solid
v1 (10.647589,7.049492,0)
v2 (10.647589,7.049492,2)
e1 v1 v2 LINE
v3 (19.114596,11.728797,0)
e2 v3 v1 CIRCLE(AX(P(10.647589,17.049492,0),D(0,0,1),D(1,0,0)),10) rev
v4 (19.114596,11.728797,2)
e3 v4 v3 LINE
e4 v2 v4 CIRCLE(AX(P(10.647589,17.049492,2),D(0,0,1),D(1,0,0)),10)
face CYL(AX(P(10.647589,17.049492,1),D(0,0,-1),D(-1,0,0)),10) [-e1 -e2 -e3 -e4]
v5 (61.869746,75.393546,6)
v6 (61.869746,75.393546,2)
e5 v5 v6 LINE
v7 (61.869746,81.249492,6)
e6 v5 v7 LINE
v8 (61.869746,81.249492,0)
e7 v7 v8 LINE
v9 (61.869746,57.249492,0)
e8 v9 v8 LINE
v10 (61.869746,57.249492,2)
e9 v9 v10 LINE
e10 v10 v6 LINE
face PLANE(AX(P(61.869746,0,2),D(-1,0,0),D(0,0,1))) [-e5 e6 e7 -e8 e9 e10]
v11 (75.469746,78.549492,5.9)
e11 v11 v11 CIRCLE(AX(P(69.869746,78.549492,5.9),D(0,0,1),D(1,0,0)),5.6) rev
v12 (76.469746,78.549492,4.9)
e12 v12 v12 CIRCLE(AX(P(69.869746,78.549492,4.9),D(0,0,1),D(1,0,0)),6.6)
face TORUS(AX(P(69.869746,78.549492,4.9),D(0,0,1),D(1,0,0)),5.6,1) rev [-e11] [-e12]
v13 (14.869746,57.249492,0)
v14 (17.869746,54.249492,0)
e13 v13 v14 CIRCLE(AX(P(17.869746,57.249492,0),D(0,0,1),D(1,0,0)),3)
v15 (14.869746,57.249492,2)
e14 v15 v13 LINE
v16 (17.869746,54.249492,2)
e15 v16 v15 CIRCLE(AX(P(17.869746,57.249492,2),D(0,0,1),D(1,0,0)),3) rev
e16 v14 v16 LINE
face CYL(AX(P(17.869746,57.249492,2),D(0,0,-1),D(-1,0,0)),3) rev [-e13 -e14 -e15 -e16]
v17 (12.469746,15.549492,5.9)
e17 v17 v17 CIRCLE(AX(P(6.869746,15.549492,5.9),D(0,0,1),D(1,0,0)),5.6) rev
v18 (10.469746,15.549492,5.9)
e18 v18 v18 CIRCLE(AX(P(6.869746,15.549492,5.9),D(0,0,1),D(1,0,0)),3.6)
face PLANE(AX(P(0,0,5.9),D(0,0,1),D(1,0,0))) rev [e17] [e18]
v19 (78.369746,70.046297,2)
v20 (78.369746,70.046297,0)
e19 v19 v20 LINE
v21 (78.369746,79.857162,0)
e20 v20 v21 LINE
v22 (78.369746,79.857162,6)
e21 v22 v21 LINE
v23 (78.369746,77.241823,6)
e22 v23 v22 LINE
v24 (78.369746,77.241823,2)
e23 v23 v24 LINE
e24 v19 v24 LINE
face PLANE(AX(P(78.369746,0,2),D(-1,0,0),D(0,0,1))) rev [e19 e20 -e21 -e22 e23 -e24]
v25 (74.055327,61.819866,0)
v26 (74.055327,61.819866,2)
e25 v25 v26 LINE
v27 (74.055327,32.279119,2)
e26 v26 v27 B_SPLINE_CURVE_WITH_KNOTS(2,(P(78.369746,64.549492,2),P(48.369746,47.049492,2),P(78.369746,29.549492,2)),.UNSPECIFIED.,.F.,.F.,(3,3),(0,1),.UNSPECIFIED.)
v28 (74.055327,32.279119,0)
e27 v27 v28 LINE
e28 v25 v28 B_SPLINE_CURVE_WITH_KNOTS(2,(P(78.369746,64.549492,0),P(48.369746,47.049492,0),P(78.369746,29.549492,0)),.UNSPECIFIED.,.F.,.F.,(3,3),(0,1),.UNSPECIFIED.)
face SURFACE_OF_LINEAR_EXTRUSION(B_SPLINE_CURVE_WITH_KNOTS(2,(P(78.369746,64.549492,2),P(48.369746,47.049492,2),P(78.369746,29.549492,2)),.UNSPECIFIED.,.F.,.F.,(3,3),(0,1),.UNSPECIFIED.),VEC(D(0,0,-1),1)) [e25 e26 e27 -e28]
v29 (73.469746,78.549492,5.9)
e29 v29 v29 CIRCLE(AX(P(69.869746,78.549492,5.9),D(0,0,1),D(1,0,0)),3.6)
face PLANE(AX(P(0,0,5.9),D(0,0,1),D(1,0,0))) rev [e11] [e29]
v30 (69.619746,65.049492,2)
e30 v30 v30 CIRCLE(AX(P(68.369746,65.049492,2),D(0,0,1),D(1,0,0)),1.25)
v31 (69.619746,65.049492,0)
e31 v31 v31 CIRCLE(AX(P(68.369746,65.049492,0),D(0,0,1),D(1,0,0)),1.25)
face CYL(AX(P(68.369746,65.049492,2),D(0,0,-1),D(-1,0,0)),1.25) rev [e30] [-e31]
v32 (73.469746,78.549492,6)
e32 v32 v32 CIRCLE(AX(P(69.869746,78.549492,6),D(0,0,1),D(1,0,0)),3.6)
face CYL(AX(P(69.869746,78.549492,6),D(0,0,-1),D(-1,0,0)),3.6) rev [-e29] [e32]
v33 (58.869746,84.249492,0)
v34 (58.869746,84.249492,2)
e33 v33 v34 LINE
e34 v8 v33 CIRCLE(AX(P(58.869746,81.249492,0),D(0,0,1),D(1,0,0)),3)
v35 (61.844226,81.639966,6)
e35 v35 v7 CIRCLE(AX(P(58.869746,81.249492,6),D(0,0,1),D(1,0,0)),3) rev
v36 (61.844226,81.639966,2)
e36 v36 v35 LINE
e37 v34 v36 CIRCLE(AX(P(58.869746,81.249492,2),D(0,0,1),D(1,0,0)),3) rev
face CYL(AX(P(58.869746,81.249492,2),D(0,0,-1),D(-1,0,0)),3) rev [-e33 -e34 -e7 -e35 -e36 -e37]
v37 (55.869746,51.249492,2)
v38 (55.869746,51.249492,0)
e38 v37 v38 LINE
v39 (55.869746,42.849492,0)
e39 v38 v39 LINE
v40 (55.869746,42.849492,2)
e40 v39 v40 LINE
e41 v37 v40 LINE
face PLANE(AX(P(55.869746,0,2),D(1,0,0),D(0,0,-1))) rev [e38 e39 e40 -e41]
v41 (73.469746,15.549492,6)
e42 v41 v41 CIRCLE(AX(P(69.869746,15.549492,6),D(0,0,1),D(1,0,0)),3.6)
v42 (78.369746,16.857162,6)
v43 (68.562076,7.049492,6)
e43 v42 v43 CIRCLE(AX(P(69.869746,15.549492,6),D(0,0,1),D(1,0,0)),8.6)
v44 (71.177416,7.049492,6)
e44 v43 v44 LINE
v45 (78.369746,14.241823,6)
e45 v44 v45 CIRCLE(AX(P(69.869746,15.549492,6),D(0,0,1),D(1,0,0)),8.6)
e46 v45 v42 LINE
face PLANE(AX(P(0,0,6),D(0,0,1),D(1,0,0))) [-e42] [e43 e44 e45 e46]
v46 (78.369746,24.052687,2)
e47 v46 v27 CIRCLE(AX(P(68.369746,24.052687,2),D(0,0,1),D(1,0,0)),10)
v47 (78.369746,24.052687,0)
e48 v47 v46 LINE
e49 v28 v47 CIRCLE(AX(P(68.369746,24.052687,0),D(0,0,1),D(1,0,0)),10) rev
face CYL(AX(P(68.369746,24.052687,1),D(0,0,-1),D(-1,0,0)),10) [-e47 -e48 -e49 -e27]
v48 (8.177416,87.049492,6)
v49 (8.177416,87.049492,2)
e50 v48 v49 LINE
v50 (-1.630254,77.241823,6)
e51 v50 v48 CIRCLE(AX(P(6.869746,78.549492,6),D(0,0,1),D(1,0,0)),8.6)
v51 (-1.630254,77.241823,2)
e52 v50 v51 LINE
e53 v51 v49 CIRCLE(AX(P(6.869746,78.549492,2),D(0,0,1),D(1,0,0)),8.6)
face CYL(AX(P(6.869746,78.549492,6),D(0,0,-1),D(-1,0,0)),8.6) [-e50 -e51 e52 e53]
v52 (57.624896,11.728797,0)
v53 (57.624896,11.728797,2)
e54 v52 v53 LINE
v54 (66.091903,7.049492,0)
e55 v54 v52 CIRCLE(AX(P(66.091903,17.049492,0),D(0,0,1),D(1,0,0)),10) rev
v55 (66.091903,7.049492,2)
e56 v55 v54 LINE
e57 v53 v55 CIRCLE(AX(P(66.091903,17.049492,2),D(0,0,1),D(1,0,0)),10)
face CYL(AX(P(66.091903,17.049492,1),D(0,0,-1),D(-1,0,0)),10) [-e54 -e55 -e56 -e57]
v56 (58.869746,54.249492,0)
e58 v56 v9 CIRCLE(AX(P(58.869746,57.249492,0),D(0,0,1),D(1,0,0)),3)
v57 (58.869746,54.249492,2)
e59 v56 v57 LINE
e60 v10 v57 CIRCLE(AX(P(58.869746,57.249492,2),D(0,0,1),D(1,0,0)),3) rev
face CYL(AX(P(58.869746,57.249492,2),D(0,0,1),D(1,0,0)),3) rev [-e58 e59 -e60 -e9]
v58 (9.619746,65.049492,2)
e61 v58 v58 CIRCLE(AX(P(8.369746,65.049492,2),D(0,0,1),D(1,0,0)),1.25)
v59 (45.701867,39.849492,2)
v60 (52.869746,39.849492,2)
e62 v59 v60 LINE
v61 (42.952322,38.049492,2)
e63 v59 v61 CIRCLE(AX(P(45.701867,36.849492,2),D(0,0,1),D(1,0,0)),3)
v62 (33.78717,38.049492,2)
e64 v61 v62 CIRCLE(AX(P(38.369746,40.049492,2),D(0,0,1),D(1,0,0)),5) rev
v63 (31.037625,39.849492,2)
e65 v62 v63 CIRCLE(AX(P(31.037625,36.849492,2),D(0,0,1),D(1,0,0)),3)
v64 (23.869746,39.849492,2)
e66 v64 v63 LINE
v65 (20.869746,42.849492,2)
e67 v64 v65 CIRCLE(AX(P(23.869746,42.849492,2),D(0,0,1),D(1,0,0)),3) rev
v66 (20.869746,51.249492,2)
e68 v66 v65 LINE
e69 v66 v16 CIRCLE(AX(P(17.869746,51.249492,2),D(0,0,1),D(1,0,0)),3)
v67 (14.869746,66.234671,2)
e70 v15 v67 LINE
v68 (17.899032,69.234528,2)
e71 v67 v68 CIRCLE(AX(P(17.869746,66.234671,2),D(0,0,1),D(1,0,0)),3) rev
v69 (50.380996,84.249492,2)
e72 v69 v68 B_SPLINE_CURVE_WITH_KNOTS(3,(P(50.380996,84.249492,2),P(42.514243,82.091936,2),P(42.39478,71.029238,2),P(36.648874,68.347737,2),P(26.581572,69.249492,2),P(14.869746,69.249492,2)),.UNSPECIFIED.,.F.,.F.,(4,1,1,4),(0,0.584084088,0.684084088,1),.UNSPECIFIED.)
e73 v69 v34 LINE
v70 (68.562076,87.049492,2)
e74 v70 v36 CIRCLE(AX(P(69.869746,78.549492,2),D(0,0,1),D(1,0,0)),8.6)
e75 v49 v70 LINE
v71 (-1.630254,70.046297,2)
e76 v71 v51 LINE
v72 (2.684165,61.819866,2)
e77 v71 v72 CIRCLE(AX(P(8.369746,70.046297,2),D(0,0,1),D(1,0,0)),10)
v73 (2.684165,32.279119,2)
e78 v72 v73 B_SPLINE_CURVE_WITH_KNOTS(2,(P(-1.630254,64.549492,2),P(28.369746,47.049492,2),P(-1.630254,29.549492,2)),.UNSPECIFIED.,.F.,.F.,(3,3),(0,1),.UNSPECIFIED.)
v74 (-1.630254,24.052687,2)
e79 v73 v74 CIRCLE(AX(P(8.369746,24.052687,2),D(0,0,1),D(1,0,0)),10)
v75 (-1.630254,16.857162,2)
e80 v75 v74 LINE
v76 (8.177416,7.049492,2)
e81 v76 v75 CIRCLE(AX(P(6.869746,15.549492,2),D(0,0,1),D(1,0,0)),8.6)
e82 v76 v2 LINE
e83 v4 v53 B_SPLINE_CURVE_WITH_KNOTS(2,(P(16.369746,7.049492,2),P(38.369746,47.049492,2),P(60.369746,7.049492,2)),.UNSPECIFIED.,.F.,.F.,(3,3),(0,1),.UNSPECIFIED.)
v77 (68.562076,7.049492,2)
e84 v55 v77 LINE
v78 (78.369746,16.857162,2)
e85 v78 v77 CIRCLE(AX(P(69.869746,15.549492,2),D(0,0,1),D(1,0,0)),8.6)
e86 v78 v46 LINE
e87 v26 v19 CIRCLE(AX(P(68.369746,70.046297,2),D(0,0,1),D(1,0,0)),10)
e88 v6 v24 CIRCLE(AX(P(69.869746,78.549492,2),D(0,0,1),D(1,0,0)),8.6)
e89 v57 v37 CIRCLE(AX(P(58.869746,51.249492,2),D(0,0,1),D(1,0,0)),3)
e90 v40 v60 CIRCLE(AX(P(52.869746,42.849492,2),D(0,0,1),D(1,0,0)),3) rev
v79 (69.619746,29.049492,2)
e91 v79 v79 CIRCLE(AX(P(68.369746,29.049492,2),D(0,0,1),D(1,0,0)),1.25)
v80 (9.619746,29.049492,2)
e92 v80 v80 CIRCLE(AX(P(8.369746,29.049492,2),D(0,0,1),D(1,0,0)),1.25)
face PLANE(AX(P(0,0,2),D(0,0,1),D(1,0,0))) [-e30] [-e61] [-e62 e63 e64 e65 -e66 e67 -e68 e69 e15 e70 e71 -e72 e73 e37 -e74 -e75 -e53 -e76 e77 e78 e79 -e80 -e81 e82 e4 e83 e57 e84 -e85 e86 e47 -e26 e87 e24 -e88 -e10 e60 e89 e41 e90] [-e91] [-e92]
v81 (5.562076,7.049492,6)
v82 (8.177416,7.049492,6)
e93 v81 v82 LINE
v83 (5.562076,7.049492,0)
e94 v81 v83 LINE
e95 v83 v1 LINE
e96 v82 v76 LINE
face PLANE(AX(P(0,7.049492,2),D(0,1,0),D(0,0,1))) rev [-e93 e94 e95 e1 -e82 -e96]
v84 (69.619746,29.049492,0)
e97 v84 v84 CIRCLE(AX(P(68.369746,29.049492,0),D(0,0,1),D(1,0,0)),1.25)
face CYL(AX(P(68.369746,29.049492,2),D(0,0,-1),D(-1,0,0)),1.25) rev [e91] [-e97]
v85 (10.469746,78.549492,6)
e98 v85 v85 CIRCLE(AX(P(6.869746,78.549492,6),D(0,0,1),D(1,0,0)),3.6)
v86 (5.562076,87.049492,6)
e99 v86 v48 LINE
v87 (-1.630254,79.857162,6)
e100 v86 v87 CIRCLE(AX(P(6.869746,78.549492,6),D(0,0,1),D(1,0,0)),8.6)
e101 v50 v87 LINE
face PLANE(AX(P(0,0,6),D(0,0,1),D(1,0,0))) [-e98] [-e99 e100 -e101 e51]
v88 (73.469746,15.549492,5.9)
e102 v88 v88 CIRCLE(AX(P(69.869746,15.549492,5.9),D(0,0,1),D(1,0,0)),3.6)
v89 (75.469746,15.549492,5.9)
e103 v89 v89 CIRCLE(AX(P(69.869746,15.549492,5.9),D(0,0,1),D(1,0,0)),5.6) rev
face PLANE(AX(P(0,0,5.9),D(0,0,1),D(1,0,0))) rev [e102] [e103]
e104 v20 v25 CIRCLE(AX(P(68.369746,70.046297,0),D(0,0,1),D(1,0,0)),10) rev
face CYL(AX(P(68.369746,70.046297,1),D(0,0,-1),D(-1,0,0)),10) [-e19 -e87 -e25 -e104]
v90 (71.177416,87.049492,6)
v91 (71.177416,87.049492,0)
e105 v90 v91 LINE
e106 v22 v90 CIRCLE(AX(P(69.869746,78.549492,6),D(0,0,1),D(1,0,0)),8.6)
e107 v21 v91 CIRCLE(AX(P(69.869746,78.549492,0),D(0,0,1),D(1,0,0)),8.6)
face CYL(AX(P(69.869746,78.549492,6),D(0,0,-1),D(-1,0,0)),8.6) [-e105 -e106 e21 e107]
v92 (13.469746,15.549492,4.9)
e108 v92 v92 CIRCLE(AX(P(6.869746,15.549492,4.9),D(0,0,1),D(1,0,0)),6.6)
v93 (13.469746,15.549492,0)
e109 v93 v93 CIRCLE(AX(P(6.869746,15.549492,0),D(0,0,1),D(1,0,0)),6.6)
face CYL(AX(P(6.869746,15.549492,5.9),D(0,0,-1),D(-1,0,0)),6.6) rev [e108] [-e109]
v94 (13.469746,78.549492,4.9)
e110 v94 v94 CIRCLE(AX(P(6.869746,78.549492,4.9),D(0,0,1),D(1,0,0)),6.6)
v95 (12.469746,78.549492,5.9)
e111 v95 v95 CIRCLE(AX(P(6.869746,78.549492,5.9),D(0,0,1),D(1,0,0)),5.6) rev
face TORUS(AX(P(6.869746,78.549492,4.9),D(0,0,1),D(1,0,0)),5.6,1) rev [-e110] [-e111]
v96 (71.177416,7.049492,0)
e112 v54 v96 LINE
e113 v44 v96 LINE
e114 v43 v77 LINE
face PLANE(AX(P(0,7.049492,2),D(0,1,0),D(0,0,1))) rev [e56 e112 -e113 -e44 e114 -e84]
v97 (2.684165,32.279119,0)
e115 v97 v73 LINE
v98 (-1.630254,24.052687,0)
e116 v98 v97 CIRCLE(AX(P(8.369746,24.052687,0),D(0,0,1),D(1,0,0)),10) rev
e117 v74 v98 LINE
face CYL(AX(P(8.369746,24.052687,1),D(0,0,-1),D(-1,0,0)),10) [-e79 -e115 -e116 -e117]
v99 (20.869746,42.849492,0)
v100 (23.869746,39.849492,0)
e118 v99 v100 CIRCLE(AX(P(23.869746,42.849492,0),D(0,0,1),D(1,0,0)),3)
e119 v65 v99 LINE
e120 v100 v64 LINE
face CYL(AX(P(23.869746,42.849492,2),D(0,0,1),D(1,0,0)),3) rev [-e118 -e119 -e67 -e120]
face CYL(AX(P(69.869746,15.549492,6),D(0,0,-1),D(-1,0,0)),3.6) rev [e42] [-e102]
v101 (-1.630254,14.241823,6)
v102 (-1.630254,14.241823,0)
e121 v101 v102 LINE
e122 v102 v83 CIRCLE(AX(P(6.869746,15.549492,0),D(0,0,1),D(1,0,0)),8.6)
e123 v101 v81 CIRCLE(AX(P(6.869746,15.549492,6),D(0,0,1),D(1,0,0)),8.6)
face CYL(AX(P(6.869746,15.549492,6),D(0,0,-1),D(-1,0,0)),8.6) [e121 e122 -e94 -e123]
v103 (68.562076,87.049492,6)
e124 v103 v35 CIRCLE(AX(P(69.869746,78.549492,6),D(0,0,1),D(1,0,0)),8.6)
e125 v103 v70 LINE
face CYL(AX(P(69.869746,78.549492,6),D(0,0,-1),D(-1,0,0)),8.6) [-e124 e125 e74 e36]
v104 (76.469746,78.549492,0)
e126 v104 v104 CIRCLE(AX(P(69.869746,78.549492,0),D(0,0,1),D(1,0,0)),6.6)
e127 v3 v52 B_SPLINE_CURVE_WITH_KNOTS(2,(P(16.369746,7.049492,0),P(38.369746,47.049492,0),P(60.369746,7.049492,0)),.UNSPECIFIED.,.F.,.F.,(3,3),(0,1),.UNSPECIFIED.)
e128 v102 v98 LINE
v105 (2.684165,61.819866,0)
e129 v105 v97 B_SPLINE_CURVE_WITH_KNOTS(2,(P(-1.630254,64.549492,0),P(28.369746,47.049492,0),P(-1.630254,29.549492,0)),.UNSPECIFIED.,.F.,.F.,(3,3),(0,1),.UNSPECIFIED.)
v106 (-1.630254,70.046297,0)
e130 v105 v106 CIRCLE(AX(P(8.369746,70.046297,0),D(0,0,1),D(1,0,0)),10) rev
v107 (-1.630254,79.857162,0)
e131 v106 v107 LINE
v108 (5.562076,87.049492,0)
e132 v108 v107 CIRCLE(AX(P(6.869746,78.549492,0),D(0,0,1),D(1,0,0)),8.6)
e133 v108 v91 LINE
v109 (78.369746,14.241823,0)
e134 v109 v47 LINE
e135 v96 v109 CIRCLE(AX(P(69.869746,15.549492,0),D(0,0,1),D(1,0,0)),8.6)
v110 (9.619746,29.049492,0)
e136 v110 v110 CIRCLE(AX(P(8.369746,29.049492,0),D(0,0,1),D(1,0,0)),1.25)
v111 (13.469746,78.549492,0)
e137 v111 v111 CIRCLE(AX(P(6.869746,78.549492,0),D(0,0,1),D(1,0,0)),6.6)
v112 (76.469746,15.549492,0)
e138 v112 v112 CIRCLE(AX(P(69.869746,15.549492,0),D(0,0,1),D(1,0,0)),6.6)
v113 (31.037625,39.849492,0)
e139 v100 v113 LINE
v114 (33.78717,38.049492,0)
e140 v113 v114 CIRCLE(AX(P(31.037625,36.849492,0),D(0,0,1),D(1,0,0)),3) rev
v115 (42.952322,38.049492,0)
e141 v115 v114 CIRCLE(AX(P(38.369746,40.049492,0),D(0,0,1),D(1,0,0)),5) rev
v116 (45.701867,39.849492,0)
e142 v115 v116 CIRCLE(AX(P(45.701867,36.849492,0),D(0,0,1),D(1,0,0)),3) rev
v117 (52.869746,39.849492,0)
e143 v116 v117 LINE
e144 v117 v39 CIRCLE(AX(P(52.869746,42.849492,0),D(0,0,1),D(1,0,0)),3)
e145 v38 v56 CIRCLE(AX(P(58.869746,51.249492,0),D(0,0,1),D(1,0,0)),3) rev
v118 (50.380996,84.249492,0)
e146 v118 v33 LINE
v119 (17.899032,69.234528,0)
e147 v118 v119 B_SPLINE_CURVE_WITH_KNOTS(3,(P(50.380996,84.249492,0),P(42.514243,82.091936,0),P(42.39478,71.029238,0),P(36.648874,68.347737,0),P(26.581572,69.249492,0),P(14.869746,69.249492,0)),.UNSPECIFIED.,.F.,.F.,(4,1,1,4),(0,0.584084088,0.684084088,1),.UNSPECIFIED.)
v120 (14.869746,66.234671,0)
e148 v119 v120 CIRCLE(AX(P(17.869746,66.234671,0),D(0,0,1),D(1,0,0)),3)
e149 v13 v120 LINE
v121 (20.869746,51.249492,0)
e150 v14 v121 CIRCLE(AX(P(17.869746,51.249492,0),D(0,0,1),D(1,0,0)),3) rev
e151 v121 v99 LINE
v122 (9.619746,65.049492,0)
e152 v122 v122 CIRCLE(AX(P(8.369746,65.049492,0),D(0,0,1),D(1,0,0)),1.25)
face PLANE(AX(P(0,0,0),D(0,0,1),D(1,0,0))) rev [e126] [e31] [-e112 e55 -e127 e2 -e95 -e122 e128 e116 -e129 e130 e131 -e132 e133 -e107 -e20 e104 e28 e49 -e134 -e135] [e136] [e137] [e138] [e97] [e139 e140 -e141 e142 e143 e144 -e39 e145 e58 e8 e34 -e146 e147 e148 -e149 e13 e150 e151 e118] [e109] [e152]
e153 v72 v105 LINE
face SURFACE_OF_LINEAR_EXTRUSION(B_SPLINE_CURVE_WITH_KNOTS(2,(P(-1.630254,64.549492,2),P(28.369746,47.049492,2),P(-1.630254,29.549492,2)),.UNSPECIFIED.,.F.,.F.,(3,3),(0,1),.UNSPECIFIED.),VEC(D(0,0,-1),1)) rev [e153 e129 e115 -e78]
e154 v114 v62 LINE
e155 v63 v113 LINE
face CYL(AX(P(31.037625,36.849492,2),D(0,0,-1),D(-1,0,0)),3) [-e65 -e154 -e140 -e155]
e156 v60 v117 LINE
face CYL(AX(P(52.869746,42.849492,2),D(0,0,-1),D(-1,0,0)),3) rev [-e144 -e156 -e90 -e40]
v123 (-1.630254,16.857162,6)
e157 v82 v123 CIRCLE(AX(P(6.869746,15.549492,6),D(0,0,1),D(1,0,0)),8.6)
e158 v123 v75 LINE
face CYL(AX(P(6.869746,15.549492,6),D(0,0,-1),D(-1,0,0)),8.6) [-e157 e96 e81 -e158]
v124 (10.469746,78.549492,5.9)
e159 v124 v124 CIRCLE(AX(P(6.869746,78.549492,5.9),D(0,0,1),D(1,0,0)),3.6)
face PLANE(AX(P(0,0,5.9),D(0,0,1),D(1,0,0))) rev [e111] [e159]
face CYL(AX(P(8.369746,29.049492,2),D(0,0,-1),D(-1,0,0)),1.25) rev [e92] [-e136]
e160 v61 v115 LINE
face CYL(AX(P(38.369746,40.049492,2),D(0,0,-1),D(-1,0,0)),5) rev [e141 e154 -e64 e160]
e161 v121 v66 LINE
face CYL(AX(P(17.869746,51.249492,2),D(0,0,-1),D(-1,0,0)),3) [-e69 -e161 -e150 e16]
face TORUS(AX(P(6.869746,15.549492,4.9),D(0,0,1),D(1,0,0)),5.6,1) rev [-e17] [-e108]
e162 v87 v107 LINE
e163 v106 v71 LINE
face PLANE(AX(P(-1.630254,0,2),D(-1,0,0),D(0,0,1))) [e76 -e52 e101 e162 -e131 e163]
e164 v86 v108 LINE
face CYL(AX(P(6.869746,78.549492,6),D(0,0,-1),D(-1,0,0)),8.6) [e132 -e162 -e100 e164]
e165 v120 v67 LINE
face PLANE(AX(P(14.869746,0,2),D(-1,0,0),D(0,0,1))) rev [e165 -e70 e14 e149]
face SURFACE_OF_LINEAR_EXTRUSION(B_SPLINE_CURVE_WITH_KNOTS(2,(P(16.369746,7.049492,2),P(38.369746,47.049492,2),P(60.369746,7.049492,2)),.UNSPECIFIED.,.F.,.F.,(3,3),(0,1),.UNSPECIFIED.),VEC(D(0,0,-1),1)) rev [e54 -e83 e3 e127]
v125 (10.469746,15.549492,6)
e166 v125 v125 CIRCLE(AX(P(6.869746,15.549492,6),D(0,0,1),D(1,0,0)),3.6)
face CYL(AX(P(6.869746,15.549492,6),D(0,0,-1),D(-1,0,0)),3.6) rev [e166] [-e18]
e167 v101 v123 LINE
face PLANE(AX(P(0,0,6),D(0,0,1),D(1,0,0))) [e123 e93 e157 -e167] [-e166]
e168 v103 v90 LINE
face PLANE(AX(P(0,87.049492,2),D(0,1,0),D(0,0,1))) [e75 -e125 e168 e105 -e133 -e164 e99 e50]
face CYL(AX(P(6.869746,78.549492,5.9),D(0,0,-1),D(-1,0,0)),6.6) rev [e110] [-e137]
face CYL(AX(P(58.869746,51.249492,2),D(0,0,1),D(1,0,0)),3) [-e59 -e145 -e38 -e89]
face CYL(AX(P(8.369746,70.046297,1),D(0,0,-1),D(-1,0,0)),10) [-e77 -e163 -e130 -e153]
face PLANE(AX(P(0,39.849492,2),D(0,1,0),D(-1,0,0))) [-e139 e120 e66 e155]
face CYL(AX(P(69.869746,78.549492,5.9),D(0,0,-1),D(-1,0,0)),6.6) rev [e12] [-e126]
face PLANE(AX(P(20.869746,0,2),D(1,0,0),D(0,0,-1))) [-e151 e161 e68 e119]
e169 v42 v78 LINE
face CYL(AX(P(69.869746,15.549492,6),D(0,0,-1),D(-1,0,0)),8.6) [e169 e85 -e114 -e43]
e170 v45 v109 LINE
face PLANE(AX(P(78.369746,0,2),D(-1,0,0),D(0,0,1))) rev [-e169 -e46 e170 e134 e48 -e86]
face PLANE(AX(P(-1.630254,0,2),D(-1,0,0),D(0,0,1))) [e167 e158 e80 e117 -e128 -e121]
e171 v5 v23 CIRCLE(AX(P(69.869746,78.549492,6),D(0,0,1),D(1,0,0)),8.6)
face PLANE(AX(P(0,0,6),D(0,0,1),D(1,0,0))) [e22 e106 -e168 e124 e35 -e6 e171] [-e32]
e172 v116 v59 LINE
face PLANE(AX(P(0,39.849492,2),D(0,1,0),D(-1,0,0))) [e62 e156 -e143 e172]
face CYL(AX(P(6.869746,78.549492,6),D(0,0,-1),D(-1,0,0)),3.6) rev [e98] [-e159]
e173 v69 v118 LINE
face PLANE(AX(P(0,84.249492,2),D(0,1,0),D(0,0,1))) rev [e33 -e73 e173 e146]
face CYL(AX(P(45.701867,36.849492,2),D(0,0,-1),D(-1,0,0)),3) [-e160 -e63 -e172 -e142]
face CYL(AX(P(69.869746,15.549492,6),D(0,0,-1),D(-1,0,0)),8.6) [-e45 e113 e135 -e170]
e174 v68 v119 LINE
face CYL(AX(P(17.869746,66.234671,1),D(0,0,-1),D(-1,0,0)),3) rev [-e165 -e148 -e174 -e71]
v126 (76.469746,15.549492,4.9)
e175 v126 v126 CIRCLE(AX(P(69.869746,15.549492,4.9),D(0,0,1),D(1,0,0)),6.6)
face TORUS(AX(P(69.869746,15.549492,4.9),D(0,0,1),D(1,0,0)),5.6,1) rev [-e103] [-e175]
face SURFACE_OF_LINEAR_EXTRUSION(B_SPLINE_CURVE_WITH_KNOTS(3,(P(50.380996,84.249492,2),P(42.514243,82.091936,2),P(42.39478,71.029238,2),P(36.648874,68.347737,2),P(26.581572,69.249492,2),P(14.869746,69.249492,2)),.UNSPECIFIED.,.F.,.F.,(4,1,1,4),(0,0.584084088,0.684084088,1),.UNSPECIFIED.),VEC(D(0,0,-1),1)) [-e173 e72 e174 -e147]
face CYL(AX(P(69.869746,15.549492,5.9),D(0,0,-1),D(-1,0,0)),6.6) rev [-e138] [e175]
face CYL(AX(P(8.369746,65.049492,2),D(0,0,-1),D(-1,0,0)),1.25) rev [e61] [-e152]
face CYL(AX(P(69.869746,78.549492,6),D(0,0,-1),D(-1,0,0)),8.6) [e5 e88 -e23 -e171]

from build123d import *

# Parameters (mm, degrees)
SKETCH2_R           = 1.25
SKETCH2_R_2         = 1
BOSS_EXTRUDE1_DEPTH = 2
SKETCH2_6_R         = 3.6
BOSS_EXTRUDE2_DEPTH = 6
SKETCH2_7_R         = 6.6
SKETCH2_7_R_2       = 3.6
CUT_EXTRUDE1_DEPTH  = 5.9
FILLET1_START       = -1
FILLET1_DEPTH       = 7
FILLET1_2_DEPTH     = 2
FILLET1_START_2     = 1.81644
FILLET1_3_DEPTH     = 4.18356
FILLET2_START       = -1
FILLET2_DEPTH       = 7
FILLET3_R           = 1


with BuildPart() as part:
    # Sketch2 → Boss-Extrude1 (new body)
    # profile 1 of 9: a face of its own
    with BuildSketch(Plane.XY):
        with BuildLine():
            Line((55.869745962, 39.84949243), (43.365744361, 39.84949243))
            ThreePointArc((43.365744361, 39.84949243), (38.369745962, 35.04949243), (33.373747564, 39.84949243))
            Line((33.373747564, 39.84949243), (20.869745962, 39.84949243))
            Line((20.869745962, 39.84949243), (20.869745962, 54.24949243))
            Line((20.869745962, 54.24949243), (20.591198677, 54.24949243))
            ThreePointArc((20.591198677, 54.24949243), (15.880795925, 53.206833158), (14.869745962, 57.924121619))
            Line((14.869745962, 57.924121619), (14.869745962, 69.24949243))
            Line((14.869745962, 69.24949243), (14.869745962, 75.393545662))
            ThreePointArc((14.869745962, 75.393545662), (5.912389161, 70.002945294), (-1.630254038, 77.241822747))
            Line((-1.630254038, 77.241822747), (-1.630254038, 64.54949243))
            add(Edge.make_bspline(
                [(-1.630254038, 64.54949243), (28.369745962, 47.04949243), (-1.630254038, 29.54949243)],
                knots=[0, 0, 0, 1, 1, 1], degree=2))
            Line((-1.630254038, 29.54949243), (-1.630254038, 16.857162113))
            ThreePointArc((-1.630254038, 16.857162113), (7.525489815, 24.124455987), (15.469745962, 15.54949243))
            ThreePointArc((15.469745962, 15.54949243), (13.396841766, 9.949758475), (8.177415645, 7.04949243))
            Line((8.177415645, 7.04949243), (16.369745962, 7.04949243))
            add(Edge.make_bspline(
                [(16.369745962, 7.04949243), (38.369745962, 47.04949243), (60.369745962, 7.04949243)],
                knots=[0, 0, 0, 1, 1, 1], degree=2))
            Line((60.369745962, 7.04949243), (68.562076279, 7.04949243))
            ThreePointArc((68.562076279, 7.04949243), (63.788627644, 21.630610748), (78.369745962, 16.857162113))
            Line((78.369745962, 16.857162113), (78.369745962, 29.54949243))
            add(Edge.make_bspline(
                [(78.369745962, 64.54949243), (48.369745962, 47.04949243), (78.369745962, 29.54949243)],
                knots=[0, 0, 0, 1, 1, 1], degree=2))
            Line((78.369745962, 64.54949243), (78.369745962, 77.241822747))
            ThreePointArc((78.369745962, 77.241822747), (70.827102764, 70.002945294), (61.869745962, 75.393545662))
            Line((61.869745962, 75.393545662), (61.869745962, 57.924121619))
            ThreePointArc((61.869745962, 57.924121619), (62.280525574, 57.035978122), (62.421340097, 56.067623833))
            ThreePointArc((62.421340097, 56.067623833), (59.967817965, 52.802018278), (56.148293247, 54.24949243))
            Line((56.148293247, 54.24949243), (55.869745962, 54.24949243))
            Line((55.869745962, 54.24949243), (55.869745962, 39.84949243))
        make_face()
        with Locations((8.369745962, 29.04949243)):
            Circle(SKETCH2_R, mode=Mode.SUBTRACT)
        with Locations((68.369745962, 29.04949243)):
            Circle(SKETCH2_R, mode=Mode.SUBTRACT)
        with Locations((8.369745962, 65.04949243)):
            Circle(SKETCH2_R, mode=Mode.SUBTRACT)
        with Locations((68.369745962, 65.04949243)):
            Circle(SKETCH2_R, mode=Mode.SUBTRACT)
    # profile 2 of 9: a face of its own
    with BuildSketch(Plane.XY):
        with BuildLine():
            Line((61.869745962, 54.24949243), (56.148293247, 54.24949243))
            ThreePointArc((56.148293247, 54.24949243), (59.967817965, 52.802018278), (62.421340097, 56.067623833))
            ThreePointArc((62.421340097, 56.067623833), (62.280525574, 57.035978122), (61.869745962, 57.924121619))
            Line((61.869745962, 57.924121619), (61.869745962, 54.24949243))
        make_face()
    # profile 3 of 9: a face of its own
    with BuildSketch(Plane.XY):
        with BuildLine():
            ThreePointArc((14.869745962, 57.924121619), (15.880795925, 53.206833158), (20.591198677, 54.24949243))
            Line((20.591198677, 54.24949243), (14.869745962, 54.24949243))
            Line((14.869745962, 54.24949243), (14.869745962, 57.924121619))
        make_face()
    # profile 4 of 9: a face of its own
    with BuildSketch(Plane.XY):
        with BuildLine():
            Line((14.869745962, 75.393545662), (14.869745962, 69.24949243))
            add(Edge.make_bspline(
                [(50.380995799, 84.24949243), (42.514243304, 82.091935647), (42.394780295, 71.029237655), (36.64887418, 68.347737451), (26.581571934, 69.24949243), (14.869745962, 69.24949243)],
                knots=[0, 0, 0, 0, 0.584084088, 0.684084088, 1, 1, 1, 1], degree=3))
            Line((50.380995799, 84.24949243), (20.591198677, 84.24949243))
            ThreePointArc((20.591198677, 84.24949243), (20.983757383, 83.377838895), (21.118151828, 82.431361027))
            ThreePointArc((21.118151828, 82.431361027), (19.041016525, 79.299264446), (15.347546538, 79.994102206))
            ThreePointArc((15.347546538, 79.994102206), (15.439141651, 79.274376922), (15.469745962, 78.54949243))
            ThreePointArc((15.469745962, 78.54949243), (15.318414496, 76.94325459), (14.869745962, 75.393545662))
        make_face()
    # profile 5 of 9: a face of its own
    with BuildSketch(Plane.XY):
        with BuildLine():
            Line((61.869745962, 84.24949243), (61.869745962, 81.705439198))
            ThreePointArc((61.869745962, 81.705439198), (62.115152293, 82.26786264), (62.400038731, 82.811355155))
            ThreePointArc((62.400038731, 82.811355155), (59.783560956, 85.744821357), (56.148293247, 84.24949243))
            Line((56.148293247, 84.24949243), (61.869745962, 84.24949243))
        make_face()
    # profile 6 of 9: a face of its own
    with BuildSketch(Plane.XY):
        with BuildLine():
            Line((50.380995799, 84.24949243), (56.148293247, 84.24949243))
            ThreePointArc((56.148293247, 84.24949243), (59.783560956, 85.744821357), (62.400038731, 82.811355155))
            ThreePointArc((62.400038731, 82.811355155), (64.996242267, 85.635320662), (68.562076279, 87.04949243))
            Line((68.562076279, 87.04949243), (8.177415645, 87.04949243))
            ThreePointArc((8.177415645, 87.04949243), (11.743249657, 85.635320662), (14.339453193, 82.811355155))
            ThreePointArc((14.339453193, 82.811355155), (16.955930969, 85.744821357), (20.591198677, 84.24949243))
            Line((20.591198677, 84.24949243), (50.380995799, 84.24949243))
        make_face()
    # profile 7 of 9: a face of its own
    with BuildSketch(Plane.XY):
        with BuildLine():
            ThreePointArc((21.118151828, 82.431361027), (20.983757383, 83.377838895), (20.591198677, 84.24949243))
            Line((20.591198677, 84.24949243), (14.869745962, 84.24949243))
            Line((14.869745962, 84.24949243), (14.869745962, 81.705439198))
            ThreePointArc((14.869745962, 81.705439198), (15.152960708, 80.862143177), (15.347546538, 79.994102206))
            ThreePointArc((15.347546538, 79.994102206), (19.041016525, 79.299264446), (21.118151828, 82.431361027))
        make_face()
        with Locations((17.718151828, 82.431361027)):
            Circle(SKETCH2_R_2, mode=Mode.SUBTRACT)
    # profile 8 of 9: a face of its own
    with BuildSketch(Plane.XY):
        with BuildLine():
            Line((14.869745962, 84.24949243), (20.591198677, 84.24949243))
            ThreePointArc((20.591198677, 84.24949243), (16.955930969, 85.744821357), (14.339453193, 82.811355155))
            ThreePointArc((14.339453193, 82.811355155), (14.624339632, 82.26786264), (14.869745962, 81.705439198))
            Line((14.869745962, 81.705439198), (14.869745962, 84.24949243))
        make_face()
    # profile 9 of 9: a face of its own
    with BuildSketch(Plane.XY):
        with Locations((17.718151828, 82.431361027)):
            Circle(SKETCH2_R_2)
    extrude(amount=BOSS_EXTRUDE1_DEPTH)

    # Sketch2<6> → Boss-Extrude2 (add)
    # profile 1 of 4: a face of its own
    with BuildSketch(Plane.XY):
        with BuildLine():
            Line((61.869745962, 81.705439198), (61.869745962, 75.393545662))
            ThreePointArc((61.869745962, 75.393545662), (70.827102764, 70.002945294), (78.369745962, 77.241822747))
            Line((78.369745962, 77.241822747), (78.369745962, 79.857162113))
            ThreePointArc((78.369745962, 79.857162113), (75.95086428, 84.630610748), (71.177415645, 87.04949243))
            Line((71.177415645, 87.04949243), (68.562076279, 87.04949243))
            ThreePointArc((68.562076279, 87.04949243), (64.503378013, 85.269767352), (61.869745962, 81.705439198))
        make_face()
        with Locations((69.869745962, 78.54949243)):
            Circle(SKETCH2_6_R, mode=Mode.SUBTRACT)
    # profile 2 of 4: a face of its own
    with BuildSketch(Plane.XY):
        with BuildLine():
            ThreePointArc((-1.630254038, 77.241822747), (12.95086428, 72.468374112), (8.177415645, 87.04949243))
            Line((8.177415645, 87.04949243), (5.562076279, 87.04949243))
            ThreePointArc((5.562076279, 87.04949243), (0.788627644, 84.630610748), (-1.630254038, 79.857162113))
            Line((-1.630254038, 79.857162113), (-1.630254038, 77.241822747))
        make_face()
        with Locations((6.869745962, 78.54949243)):
            Circle(SKETCH2_6_R, mode=Mode.SUBTRACT)
    # profile 3 of 4: a face of its own
    with BuildSketch(Plane.XY):
        with BuildLine():
            Line((78.369745962, 14.241822747), (78.369745962, 16.857162113))
            ThreePointArc((78.369745962, 16.857162113), (63.788627644, 21.630610748), (68.562076279, 7.04949243))
            Line((68.562076279, 7.04949243), (71.177415645, 7.04949243))
            ThreePointArc((71.177415645, 7.04949243), (75.95086428, 9.468374112), (78.369745962, 14.241822747))
        make_face()
        with Locations((69.869745962, 15.54949243)):
            Circle(SKETCH2_6_R, mode=Mode.SUBTRACT)
    # profile 4 of 4: a face of its own
    with BuildSketch(Plane.XY):
        with BuildLine():
            ThreePointArc((8.177415645, 7.04949243), (12.95086428, 21.630610748), (-1.630254038, 16.857162113))
            Line((-1.630254038, 16.857162113), (-1.630254038, 14.241822747))
            ThreePointArc((-1.630254038, 14.241822747), (0.788627644, 9.468374112), (5.562076279, 7.04949243))
            Line((5.562076279, 7.04949243), (8.177415645, 7.04949243))
        make_face()
        with Locations((6.869745962, 15.54949243)):
            Circle(SKETCH2_6_R, mode=Mode.SUBTRACT)
    extrude(amount=BOSS_EXTRUDE2_DEPTH)

    # Sketch2<7> → Cut-Extrude1 (cut)
    # profile 1 of 4: a face of its own
    with BuildSketch(Plane.XY):
        with Locations((6.869745962, 15.54949243)):
            Circle(SKETCH2_7_R)
        with Locations((6.869745962, 15.54949243)):
            Circle(SKETCH2_7_R_2, mode=Mode.SUBTRACT)
    # profile 2 of 4: a face of its own
    with BuildSketch(Plane.XY):
        with Locations((69.869745962, 15.54949243)):
            Circle(SKETCH2_7_R)
        with Locations((69.869745962, 15.54949243)):
            Circle(SKETCH2_7_R_2, mode=Mode.SUBTRACT)
    # profile 3 of 4: a face of its own
    with BuildSketch(Plane.XY):
        with Locations((69.869745962, 78.54949243)):
            Circle(SKETCH2_7_R)
        with Locations((69.869745962, 78.54949243)):
            Circle(SKETCH2_7_R_2, mode=Mode.SUBTRACT)
    # profile 4 of 4: a face of its own
    with BuildSketch(Plane.XY):
        with Locations((6.869745962, 78.54949243)):
            Circle(SKETCH2_7_R)
        with Locations((6.869745962, 78.54949243)):
            Circle(SKETCH2_7_R_2, mode=Mode.SUBTRACT)
    extrude(amount=CUT_EXTRUDE1_DEPTH, mode=Mode.SUBTRACT)

    # Fillet1: read off the stored shape, not the designer's step
    # Fillet1 outline → Fillet1 (cut)
    with BuildSketch(Plane.XY.offset(FILLET1_START)):
        with BuildLine():
            Line((20.869745962, 54.24949243), (17.869745962, 54.24949243))
            ThreePointArc((17.869745962, 54.24949243), (19.991066306, 53.370812774), (20.869745962, 51.24949243))
            Line((20.869745962, 51.24949243), (20.869745962, 54.24949243))
        make_face()
        with BuildLine():
            Line((33.373747564, 39.84949243), (31.03762485, 39.84949243))
            ThreePointArc((31.03762485, 39.84949243), (32.680792523, 39.35947251), (33.787170267, 38.04949243))
            ThreePointArc((33.787170267, 38.04949243), (33.496628848, 38.9302384), (33.373747564, 39.84949243))
        make_face()
        with BuildLine():
            ThreePointArc((55.869745962, 51.24949243), (56.748425619, 53.370812773), (58.869745962, 54.24949243))
            Line((58.869745962, 54.24949243), (55.869745962, 54.24949243))
            Line((55.869745962, 54.24949243), (55.869745962, 51.24949243))
        make_face()
        with BuildLine():
            ThreePointArc((43.365744361, 39.84949243), (43.242863077, 38.9302384), (42.952321657, 38.04949243))
            ThreePointArc((42.952321657, 38.04949243), (44.058699401, 39.35947251), (45.701867074, 39.84949243))
            Line((45.701867074, 39.84949243), (43.365744361, 39.84949243))
        make_face()
    extrude(amount=FILLET1_DEPTH, mode=Mode.SUBTRACT)

    # Fillet1 2 outline → Fillet1 2 (add)
    with BuildSketch(Plane.XY):
        with BuildLine():
            Line((14.869745962, 69.24949243), (14.869745962, 66.234671273))
            ThreePointArc((14.869745962, 66.234671273), (15.758805302, 68.366320759), (17.899032314, 69.234528322))
            add(Edge.make_bspline(
                [(17.899032314, 69.234528322), (16.921620346, 69.244070387), (15.911772673, 69.24949243), (14.869745962, 69.24949243)],
                knots=[0.971892272, 0.971892272, 0.971892272, 0.971892272, 1, 1, 1, 1], degree=3))
        make_face()
        with BuildLine():
            ThreePointArc((17.869745962, 54.24949243), (15.748425619, 55.128172087), (14.869745962, 57.24949243))
            Line((14.869745962, 57.24949243), (14.869745962, 54.24949243))
            Line((14.869745962, 54.24949243), (17.869745962, 54.24949243))
        make_face()
        with BuildLine():
            Line((61.869745962, 84.24949243), (58.869745962, 84.24949243))
            ThreePointArc((58.869745962, 84.24949243), (60.991066306, 83.370812774), (61.869745962, 81.24949243))
            Line((61.869745962, 81.24949243), (61.869745962, 84.24949243))
        make_face()
        with BuildLine():
            ThreePointArc((23.869745962, 39.84949243), (21.748425619, 40.728172087), (20.869745962, 42.84949243))
            Line((20.869745962, 42.84949243), (20.869745962, 39.84949243))
            Line((20.869745962, 39.84949243), (23.869745962, 39.84949243))
        make_face()
        with BuildLine():
            Line((61.869745962, 54.24949243), (61.869745962, 57.24949243))
            ThreePointArc((61.869745962, 57.24949243), (60.991066305, 55.128172087), (58.869745962, 54.24949243))
            Line((58.869745962, 54.24949243), (61.869745962, 54.24949243))
        make_face()
        with BuildLine():
            Line((55.869745962, 39.84949243), (55.869745962, 42.84949243))
            ThreePointArc((55.869745962, 42.84949243), (54.991066305, 40.728172086), (52.869745962, 39.84949243))
            Line((52.869745962, 39.84949243), (55.869745962, 39.84949243))
        make_face()
    extrude(amount=FILLET1_2_DEPTH)

    # Fillet1 3 outline → Fillet1 3 (add)
    with BuildSketch(Plane.XY.offset(FILLET1_START_2)):
        with BuildLine():
            ThreePointArc((61.869745963, 81.705439198), (61.856919019, 81.672728633), (61.844225823, 81.639965936))
            ThreePointArc((61.844225823, 81.639965936), (61.863359129, 81.445145718), (61.869745962, 81.24949243))
            Line((61.869745962, 81.24949243), (61.869745963, 81.705439198))
        make_face()
    extrude(amount=FILLET1_3_DEPTH)

    # Fillet2: read off the stored shape, not the designer's step
    # Fillet2 outline → Fillet2 (cut)
    with BuildSketch(Plane.XY.offset(FILLET2_START)):
        with BuildLine():
            Line((60.369745962, 7.04949243), (66.091903249, 7.04949243))
            ThreePointArc((66.091903249, 7.04949243), (61.254907797, 8.297151315), (57.624896415, 11.728797432))
            add(Edge.make_bspline(
                [(57.624896415, 11.728797432), (58.997321189, 9.5448102), (60.369745962, 7.04949243)],
                knots=[0.937617056, 0.937617056, 0.937617056, 1, 1, 1], degree=2))
        make_face()
        with BuildLine():
            add(Edge.make_bspline(
                [(16.369745962, 7.04949243), (17.742170736, 9.5448102), (19.11459551, 11.728797432)],
                knots=[0, 0, 0, 0.062382944, 0.062382944, 0.062382944], degree=2))
            ThreePointArc((19.11459551, 11.728797432), (15.484584128, 8.297151315), (10.647588675, 7.04949243))
            Line((10.647588675, 7.04949243), (16.369745962, 7.04949243))
        make_face()
        with BuildLine():
            Line((-1.630254038, 29.54949243), (-1.630254038, 24.052687418))
            ThreePointArc((-1.630254038, 24.052687418), (-0.48620705, 28.697264497), (2.684165211, 32.279118693))
            add(Edge.make_bspline(
                [(2.684165211, 32.279118693), (0.709425616, 30.914305562), (-1.630254038, 29.54949243)],
                knots=[0.922010678, 0.922010678, 0.922010678, 1, 1, 1], degree=2))
        make_face()
        with BuildLine():
            add(Edge.make_bspline(
                [(-1.630254038, 64.54949243), (0.709425616, 63.184679299), (2.684165211, 61.819866167)],
                knots=[0, 0, 0, 0.077989322, 0.077989322, 0.077989322], degree=2))
            ThreePointArc((2.684165211, 61.819866167), (-0.48620705, 65.401720363), (-1.630254038, 70.046297442))
            Line((-1.630254038, 70.046297442), (-1.630254038, 64.54949243))
        make_face()
        with BuildLine():
            Line((78.369745962, 64.54949243), (78.369745962, 70.046297442))
            ThreePointArc((78.369745962, 70.046297442), (77.225698974, 65.401720363), (74.055326713, 61.819866167))
            add(Edge.make_bspline(
                [(78.369745962, 64.54949243), (76.030066308, 63.184679299), (74.055326713, 61.819866167)],
                knots=[0, 0, 0, 0.077989322, 0.077989322, 0.077989322], degree=2))
        make_face()
        with BuildLine():
            add(Edge.make_bspline(
                [(74.055326713, 32.279118693), (76.030066308, 30.914305562), (78.369745962, 29.54949243)],
                knots=[0.922010678, 0.922010678, 0.922010678, 1, 1, 1], degree=2))
            ThreePointArc((74.055326713, 32.279118693), (77.225698974, 28.697264497), (78.369745962, 24.052687418))
            Line((78.369745962, 24.052687418), (78.369745962, 29.54949243))
        make_face()
    extrude(amount=FILLET2_DEPTH, mode=Mode.SUBTRACT)

    # Fillet3
    fillet3_edges = [part.edges().sort_by_distance(p)[0] for p in [
        (0.269745962, 15.54949243, 5.9),
        (63.269745962, 15.54949243, 5.9),
        (63.269745962, 78.54949243, 5.9),
        (0.269745962, 78.54949243, 5.9),
    ]]
    fillet(fillet3_edges, radius=FILLET3_R)


solid = part.part
